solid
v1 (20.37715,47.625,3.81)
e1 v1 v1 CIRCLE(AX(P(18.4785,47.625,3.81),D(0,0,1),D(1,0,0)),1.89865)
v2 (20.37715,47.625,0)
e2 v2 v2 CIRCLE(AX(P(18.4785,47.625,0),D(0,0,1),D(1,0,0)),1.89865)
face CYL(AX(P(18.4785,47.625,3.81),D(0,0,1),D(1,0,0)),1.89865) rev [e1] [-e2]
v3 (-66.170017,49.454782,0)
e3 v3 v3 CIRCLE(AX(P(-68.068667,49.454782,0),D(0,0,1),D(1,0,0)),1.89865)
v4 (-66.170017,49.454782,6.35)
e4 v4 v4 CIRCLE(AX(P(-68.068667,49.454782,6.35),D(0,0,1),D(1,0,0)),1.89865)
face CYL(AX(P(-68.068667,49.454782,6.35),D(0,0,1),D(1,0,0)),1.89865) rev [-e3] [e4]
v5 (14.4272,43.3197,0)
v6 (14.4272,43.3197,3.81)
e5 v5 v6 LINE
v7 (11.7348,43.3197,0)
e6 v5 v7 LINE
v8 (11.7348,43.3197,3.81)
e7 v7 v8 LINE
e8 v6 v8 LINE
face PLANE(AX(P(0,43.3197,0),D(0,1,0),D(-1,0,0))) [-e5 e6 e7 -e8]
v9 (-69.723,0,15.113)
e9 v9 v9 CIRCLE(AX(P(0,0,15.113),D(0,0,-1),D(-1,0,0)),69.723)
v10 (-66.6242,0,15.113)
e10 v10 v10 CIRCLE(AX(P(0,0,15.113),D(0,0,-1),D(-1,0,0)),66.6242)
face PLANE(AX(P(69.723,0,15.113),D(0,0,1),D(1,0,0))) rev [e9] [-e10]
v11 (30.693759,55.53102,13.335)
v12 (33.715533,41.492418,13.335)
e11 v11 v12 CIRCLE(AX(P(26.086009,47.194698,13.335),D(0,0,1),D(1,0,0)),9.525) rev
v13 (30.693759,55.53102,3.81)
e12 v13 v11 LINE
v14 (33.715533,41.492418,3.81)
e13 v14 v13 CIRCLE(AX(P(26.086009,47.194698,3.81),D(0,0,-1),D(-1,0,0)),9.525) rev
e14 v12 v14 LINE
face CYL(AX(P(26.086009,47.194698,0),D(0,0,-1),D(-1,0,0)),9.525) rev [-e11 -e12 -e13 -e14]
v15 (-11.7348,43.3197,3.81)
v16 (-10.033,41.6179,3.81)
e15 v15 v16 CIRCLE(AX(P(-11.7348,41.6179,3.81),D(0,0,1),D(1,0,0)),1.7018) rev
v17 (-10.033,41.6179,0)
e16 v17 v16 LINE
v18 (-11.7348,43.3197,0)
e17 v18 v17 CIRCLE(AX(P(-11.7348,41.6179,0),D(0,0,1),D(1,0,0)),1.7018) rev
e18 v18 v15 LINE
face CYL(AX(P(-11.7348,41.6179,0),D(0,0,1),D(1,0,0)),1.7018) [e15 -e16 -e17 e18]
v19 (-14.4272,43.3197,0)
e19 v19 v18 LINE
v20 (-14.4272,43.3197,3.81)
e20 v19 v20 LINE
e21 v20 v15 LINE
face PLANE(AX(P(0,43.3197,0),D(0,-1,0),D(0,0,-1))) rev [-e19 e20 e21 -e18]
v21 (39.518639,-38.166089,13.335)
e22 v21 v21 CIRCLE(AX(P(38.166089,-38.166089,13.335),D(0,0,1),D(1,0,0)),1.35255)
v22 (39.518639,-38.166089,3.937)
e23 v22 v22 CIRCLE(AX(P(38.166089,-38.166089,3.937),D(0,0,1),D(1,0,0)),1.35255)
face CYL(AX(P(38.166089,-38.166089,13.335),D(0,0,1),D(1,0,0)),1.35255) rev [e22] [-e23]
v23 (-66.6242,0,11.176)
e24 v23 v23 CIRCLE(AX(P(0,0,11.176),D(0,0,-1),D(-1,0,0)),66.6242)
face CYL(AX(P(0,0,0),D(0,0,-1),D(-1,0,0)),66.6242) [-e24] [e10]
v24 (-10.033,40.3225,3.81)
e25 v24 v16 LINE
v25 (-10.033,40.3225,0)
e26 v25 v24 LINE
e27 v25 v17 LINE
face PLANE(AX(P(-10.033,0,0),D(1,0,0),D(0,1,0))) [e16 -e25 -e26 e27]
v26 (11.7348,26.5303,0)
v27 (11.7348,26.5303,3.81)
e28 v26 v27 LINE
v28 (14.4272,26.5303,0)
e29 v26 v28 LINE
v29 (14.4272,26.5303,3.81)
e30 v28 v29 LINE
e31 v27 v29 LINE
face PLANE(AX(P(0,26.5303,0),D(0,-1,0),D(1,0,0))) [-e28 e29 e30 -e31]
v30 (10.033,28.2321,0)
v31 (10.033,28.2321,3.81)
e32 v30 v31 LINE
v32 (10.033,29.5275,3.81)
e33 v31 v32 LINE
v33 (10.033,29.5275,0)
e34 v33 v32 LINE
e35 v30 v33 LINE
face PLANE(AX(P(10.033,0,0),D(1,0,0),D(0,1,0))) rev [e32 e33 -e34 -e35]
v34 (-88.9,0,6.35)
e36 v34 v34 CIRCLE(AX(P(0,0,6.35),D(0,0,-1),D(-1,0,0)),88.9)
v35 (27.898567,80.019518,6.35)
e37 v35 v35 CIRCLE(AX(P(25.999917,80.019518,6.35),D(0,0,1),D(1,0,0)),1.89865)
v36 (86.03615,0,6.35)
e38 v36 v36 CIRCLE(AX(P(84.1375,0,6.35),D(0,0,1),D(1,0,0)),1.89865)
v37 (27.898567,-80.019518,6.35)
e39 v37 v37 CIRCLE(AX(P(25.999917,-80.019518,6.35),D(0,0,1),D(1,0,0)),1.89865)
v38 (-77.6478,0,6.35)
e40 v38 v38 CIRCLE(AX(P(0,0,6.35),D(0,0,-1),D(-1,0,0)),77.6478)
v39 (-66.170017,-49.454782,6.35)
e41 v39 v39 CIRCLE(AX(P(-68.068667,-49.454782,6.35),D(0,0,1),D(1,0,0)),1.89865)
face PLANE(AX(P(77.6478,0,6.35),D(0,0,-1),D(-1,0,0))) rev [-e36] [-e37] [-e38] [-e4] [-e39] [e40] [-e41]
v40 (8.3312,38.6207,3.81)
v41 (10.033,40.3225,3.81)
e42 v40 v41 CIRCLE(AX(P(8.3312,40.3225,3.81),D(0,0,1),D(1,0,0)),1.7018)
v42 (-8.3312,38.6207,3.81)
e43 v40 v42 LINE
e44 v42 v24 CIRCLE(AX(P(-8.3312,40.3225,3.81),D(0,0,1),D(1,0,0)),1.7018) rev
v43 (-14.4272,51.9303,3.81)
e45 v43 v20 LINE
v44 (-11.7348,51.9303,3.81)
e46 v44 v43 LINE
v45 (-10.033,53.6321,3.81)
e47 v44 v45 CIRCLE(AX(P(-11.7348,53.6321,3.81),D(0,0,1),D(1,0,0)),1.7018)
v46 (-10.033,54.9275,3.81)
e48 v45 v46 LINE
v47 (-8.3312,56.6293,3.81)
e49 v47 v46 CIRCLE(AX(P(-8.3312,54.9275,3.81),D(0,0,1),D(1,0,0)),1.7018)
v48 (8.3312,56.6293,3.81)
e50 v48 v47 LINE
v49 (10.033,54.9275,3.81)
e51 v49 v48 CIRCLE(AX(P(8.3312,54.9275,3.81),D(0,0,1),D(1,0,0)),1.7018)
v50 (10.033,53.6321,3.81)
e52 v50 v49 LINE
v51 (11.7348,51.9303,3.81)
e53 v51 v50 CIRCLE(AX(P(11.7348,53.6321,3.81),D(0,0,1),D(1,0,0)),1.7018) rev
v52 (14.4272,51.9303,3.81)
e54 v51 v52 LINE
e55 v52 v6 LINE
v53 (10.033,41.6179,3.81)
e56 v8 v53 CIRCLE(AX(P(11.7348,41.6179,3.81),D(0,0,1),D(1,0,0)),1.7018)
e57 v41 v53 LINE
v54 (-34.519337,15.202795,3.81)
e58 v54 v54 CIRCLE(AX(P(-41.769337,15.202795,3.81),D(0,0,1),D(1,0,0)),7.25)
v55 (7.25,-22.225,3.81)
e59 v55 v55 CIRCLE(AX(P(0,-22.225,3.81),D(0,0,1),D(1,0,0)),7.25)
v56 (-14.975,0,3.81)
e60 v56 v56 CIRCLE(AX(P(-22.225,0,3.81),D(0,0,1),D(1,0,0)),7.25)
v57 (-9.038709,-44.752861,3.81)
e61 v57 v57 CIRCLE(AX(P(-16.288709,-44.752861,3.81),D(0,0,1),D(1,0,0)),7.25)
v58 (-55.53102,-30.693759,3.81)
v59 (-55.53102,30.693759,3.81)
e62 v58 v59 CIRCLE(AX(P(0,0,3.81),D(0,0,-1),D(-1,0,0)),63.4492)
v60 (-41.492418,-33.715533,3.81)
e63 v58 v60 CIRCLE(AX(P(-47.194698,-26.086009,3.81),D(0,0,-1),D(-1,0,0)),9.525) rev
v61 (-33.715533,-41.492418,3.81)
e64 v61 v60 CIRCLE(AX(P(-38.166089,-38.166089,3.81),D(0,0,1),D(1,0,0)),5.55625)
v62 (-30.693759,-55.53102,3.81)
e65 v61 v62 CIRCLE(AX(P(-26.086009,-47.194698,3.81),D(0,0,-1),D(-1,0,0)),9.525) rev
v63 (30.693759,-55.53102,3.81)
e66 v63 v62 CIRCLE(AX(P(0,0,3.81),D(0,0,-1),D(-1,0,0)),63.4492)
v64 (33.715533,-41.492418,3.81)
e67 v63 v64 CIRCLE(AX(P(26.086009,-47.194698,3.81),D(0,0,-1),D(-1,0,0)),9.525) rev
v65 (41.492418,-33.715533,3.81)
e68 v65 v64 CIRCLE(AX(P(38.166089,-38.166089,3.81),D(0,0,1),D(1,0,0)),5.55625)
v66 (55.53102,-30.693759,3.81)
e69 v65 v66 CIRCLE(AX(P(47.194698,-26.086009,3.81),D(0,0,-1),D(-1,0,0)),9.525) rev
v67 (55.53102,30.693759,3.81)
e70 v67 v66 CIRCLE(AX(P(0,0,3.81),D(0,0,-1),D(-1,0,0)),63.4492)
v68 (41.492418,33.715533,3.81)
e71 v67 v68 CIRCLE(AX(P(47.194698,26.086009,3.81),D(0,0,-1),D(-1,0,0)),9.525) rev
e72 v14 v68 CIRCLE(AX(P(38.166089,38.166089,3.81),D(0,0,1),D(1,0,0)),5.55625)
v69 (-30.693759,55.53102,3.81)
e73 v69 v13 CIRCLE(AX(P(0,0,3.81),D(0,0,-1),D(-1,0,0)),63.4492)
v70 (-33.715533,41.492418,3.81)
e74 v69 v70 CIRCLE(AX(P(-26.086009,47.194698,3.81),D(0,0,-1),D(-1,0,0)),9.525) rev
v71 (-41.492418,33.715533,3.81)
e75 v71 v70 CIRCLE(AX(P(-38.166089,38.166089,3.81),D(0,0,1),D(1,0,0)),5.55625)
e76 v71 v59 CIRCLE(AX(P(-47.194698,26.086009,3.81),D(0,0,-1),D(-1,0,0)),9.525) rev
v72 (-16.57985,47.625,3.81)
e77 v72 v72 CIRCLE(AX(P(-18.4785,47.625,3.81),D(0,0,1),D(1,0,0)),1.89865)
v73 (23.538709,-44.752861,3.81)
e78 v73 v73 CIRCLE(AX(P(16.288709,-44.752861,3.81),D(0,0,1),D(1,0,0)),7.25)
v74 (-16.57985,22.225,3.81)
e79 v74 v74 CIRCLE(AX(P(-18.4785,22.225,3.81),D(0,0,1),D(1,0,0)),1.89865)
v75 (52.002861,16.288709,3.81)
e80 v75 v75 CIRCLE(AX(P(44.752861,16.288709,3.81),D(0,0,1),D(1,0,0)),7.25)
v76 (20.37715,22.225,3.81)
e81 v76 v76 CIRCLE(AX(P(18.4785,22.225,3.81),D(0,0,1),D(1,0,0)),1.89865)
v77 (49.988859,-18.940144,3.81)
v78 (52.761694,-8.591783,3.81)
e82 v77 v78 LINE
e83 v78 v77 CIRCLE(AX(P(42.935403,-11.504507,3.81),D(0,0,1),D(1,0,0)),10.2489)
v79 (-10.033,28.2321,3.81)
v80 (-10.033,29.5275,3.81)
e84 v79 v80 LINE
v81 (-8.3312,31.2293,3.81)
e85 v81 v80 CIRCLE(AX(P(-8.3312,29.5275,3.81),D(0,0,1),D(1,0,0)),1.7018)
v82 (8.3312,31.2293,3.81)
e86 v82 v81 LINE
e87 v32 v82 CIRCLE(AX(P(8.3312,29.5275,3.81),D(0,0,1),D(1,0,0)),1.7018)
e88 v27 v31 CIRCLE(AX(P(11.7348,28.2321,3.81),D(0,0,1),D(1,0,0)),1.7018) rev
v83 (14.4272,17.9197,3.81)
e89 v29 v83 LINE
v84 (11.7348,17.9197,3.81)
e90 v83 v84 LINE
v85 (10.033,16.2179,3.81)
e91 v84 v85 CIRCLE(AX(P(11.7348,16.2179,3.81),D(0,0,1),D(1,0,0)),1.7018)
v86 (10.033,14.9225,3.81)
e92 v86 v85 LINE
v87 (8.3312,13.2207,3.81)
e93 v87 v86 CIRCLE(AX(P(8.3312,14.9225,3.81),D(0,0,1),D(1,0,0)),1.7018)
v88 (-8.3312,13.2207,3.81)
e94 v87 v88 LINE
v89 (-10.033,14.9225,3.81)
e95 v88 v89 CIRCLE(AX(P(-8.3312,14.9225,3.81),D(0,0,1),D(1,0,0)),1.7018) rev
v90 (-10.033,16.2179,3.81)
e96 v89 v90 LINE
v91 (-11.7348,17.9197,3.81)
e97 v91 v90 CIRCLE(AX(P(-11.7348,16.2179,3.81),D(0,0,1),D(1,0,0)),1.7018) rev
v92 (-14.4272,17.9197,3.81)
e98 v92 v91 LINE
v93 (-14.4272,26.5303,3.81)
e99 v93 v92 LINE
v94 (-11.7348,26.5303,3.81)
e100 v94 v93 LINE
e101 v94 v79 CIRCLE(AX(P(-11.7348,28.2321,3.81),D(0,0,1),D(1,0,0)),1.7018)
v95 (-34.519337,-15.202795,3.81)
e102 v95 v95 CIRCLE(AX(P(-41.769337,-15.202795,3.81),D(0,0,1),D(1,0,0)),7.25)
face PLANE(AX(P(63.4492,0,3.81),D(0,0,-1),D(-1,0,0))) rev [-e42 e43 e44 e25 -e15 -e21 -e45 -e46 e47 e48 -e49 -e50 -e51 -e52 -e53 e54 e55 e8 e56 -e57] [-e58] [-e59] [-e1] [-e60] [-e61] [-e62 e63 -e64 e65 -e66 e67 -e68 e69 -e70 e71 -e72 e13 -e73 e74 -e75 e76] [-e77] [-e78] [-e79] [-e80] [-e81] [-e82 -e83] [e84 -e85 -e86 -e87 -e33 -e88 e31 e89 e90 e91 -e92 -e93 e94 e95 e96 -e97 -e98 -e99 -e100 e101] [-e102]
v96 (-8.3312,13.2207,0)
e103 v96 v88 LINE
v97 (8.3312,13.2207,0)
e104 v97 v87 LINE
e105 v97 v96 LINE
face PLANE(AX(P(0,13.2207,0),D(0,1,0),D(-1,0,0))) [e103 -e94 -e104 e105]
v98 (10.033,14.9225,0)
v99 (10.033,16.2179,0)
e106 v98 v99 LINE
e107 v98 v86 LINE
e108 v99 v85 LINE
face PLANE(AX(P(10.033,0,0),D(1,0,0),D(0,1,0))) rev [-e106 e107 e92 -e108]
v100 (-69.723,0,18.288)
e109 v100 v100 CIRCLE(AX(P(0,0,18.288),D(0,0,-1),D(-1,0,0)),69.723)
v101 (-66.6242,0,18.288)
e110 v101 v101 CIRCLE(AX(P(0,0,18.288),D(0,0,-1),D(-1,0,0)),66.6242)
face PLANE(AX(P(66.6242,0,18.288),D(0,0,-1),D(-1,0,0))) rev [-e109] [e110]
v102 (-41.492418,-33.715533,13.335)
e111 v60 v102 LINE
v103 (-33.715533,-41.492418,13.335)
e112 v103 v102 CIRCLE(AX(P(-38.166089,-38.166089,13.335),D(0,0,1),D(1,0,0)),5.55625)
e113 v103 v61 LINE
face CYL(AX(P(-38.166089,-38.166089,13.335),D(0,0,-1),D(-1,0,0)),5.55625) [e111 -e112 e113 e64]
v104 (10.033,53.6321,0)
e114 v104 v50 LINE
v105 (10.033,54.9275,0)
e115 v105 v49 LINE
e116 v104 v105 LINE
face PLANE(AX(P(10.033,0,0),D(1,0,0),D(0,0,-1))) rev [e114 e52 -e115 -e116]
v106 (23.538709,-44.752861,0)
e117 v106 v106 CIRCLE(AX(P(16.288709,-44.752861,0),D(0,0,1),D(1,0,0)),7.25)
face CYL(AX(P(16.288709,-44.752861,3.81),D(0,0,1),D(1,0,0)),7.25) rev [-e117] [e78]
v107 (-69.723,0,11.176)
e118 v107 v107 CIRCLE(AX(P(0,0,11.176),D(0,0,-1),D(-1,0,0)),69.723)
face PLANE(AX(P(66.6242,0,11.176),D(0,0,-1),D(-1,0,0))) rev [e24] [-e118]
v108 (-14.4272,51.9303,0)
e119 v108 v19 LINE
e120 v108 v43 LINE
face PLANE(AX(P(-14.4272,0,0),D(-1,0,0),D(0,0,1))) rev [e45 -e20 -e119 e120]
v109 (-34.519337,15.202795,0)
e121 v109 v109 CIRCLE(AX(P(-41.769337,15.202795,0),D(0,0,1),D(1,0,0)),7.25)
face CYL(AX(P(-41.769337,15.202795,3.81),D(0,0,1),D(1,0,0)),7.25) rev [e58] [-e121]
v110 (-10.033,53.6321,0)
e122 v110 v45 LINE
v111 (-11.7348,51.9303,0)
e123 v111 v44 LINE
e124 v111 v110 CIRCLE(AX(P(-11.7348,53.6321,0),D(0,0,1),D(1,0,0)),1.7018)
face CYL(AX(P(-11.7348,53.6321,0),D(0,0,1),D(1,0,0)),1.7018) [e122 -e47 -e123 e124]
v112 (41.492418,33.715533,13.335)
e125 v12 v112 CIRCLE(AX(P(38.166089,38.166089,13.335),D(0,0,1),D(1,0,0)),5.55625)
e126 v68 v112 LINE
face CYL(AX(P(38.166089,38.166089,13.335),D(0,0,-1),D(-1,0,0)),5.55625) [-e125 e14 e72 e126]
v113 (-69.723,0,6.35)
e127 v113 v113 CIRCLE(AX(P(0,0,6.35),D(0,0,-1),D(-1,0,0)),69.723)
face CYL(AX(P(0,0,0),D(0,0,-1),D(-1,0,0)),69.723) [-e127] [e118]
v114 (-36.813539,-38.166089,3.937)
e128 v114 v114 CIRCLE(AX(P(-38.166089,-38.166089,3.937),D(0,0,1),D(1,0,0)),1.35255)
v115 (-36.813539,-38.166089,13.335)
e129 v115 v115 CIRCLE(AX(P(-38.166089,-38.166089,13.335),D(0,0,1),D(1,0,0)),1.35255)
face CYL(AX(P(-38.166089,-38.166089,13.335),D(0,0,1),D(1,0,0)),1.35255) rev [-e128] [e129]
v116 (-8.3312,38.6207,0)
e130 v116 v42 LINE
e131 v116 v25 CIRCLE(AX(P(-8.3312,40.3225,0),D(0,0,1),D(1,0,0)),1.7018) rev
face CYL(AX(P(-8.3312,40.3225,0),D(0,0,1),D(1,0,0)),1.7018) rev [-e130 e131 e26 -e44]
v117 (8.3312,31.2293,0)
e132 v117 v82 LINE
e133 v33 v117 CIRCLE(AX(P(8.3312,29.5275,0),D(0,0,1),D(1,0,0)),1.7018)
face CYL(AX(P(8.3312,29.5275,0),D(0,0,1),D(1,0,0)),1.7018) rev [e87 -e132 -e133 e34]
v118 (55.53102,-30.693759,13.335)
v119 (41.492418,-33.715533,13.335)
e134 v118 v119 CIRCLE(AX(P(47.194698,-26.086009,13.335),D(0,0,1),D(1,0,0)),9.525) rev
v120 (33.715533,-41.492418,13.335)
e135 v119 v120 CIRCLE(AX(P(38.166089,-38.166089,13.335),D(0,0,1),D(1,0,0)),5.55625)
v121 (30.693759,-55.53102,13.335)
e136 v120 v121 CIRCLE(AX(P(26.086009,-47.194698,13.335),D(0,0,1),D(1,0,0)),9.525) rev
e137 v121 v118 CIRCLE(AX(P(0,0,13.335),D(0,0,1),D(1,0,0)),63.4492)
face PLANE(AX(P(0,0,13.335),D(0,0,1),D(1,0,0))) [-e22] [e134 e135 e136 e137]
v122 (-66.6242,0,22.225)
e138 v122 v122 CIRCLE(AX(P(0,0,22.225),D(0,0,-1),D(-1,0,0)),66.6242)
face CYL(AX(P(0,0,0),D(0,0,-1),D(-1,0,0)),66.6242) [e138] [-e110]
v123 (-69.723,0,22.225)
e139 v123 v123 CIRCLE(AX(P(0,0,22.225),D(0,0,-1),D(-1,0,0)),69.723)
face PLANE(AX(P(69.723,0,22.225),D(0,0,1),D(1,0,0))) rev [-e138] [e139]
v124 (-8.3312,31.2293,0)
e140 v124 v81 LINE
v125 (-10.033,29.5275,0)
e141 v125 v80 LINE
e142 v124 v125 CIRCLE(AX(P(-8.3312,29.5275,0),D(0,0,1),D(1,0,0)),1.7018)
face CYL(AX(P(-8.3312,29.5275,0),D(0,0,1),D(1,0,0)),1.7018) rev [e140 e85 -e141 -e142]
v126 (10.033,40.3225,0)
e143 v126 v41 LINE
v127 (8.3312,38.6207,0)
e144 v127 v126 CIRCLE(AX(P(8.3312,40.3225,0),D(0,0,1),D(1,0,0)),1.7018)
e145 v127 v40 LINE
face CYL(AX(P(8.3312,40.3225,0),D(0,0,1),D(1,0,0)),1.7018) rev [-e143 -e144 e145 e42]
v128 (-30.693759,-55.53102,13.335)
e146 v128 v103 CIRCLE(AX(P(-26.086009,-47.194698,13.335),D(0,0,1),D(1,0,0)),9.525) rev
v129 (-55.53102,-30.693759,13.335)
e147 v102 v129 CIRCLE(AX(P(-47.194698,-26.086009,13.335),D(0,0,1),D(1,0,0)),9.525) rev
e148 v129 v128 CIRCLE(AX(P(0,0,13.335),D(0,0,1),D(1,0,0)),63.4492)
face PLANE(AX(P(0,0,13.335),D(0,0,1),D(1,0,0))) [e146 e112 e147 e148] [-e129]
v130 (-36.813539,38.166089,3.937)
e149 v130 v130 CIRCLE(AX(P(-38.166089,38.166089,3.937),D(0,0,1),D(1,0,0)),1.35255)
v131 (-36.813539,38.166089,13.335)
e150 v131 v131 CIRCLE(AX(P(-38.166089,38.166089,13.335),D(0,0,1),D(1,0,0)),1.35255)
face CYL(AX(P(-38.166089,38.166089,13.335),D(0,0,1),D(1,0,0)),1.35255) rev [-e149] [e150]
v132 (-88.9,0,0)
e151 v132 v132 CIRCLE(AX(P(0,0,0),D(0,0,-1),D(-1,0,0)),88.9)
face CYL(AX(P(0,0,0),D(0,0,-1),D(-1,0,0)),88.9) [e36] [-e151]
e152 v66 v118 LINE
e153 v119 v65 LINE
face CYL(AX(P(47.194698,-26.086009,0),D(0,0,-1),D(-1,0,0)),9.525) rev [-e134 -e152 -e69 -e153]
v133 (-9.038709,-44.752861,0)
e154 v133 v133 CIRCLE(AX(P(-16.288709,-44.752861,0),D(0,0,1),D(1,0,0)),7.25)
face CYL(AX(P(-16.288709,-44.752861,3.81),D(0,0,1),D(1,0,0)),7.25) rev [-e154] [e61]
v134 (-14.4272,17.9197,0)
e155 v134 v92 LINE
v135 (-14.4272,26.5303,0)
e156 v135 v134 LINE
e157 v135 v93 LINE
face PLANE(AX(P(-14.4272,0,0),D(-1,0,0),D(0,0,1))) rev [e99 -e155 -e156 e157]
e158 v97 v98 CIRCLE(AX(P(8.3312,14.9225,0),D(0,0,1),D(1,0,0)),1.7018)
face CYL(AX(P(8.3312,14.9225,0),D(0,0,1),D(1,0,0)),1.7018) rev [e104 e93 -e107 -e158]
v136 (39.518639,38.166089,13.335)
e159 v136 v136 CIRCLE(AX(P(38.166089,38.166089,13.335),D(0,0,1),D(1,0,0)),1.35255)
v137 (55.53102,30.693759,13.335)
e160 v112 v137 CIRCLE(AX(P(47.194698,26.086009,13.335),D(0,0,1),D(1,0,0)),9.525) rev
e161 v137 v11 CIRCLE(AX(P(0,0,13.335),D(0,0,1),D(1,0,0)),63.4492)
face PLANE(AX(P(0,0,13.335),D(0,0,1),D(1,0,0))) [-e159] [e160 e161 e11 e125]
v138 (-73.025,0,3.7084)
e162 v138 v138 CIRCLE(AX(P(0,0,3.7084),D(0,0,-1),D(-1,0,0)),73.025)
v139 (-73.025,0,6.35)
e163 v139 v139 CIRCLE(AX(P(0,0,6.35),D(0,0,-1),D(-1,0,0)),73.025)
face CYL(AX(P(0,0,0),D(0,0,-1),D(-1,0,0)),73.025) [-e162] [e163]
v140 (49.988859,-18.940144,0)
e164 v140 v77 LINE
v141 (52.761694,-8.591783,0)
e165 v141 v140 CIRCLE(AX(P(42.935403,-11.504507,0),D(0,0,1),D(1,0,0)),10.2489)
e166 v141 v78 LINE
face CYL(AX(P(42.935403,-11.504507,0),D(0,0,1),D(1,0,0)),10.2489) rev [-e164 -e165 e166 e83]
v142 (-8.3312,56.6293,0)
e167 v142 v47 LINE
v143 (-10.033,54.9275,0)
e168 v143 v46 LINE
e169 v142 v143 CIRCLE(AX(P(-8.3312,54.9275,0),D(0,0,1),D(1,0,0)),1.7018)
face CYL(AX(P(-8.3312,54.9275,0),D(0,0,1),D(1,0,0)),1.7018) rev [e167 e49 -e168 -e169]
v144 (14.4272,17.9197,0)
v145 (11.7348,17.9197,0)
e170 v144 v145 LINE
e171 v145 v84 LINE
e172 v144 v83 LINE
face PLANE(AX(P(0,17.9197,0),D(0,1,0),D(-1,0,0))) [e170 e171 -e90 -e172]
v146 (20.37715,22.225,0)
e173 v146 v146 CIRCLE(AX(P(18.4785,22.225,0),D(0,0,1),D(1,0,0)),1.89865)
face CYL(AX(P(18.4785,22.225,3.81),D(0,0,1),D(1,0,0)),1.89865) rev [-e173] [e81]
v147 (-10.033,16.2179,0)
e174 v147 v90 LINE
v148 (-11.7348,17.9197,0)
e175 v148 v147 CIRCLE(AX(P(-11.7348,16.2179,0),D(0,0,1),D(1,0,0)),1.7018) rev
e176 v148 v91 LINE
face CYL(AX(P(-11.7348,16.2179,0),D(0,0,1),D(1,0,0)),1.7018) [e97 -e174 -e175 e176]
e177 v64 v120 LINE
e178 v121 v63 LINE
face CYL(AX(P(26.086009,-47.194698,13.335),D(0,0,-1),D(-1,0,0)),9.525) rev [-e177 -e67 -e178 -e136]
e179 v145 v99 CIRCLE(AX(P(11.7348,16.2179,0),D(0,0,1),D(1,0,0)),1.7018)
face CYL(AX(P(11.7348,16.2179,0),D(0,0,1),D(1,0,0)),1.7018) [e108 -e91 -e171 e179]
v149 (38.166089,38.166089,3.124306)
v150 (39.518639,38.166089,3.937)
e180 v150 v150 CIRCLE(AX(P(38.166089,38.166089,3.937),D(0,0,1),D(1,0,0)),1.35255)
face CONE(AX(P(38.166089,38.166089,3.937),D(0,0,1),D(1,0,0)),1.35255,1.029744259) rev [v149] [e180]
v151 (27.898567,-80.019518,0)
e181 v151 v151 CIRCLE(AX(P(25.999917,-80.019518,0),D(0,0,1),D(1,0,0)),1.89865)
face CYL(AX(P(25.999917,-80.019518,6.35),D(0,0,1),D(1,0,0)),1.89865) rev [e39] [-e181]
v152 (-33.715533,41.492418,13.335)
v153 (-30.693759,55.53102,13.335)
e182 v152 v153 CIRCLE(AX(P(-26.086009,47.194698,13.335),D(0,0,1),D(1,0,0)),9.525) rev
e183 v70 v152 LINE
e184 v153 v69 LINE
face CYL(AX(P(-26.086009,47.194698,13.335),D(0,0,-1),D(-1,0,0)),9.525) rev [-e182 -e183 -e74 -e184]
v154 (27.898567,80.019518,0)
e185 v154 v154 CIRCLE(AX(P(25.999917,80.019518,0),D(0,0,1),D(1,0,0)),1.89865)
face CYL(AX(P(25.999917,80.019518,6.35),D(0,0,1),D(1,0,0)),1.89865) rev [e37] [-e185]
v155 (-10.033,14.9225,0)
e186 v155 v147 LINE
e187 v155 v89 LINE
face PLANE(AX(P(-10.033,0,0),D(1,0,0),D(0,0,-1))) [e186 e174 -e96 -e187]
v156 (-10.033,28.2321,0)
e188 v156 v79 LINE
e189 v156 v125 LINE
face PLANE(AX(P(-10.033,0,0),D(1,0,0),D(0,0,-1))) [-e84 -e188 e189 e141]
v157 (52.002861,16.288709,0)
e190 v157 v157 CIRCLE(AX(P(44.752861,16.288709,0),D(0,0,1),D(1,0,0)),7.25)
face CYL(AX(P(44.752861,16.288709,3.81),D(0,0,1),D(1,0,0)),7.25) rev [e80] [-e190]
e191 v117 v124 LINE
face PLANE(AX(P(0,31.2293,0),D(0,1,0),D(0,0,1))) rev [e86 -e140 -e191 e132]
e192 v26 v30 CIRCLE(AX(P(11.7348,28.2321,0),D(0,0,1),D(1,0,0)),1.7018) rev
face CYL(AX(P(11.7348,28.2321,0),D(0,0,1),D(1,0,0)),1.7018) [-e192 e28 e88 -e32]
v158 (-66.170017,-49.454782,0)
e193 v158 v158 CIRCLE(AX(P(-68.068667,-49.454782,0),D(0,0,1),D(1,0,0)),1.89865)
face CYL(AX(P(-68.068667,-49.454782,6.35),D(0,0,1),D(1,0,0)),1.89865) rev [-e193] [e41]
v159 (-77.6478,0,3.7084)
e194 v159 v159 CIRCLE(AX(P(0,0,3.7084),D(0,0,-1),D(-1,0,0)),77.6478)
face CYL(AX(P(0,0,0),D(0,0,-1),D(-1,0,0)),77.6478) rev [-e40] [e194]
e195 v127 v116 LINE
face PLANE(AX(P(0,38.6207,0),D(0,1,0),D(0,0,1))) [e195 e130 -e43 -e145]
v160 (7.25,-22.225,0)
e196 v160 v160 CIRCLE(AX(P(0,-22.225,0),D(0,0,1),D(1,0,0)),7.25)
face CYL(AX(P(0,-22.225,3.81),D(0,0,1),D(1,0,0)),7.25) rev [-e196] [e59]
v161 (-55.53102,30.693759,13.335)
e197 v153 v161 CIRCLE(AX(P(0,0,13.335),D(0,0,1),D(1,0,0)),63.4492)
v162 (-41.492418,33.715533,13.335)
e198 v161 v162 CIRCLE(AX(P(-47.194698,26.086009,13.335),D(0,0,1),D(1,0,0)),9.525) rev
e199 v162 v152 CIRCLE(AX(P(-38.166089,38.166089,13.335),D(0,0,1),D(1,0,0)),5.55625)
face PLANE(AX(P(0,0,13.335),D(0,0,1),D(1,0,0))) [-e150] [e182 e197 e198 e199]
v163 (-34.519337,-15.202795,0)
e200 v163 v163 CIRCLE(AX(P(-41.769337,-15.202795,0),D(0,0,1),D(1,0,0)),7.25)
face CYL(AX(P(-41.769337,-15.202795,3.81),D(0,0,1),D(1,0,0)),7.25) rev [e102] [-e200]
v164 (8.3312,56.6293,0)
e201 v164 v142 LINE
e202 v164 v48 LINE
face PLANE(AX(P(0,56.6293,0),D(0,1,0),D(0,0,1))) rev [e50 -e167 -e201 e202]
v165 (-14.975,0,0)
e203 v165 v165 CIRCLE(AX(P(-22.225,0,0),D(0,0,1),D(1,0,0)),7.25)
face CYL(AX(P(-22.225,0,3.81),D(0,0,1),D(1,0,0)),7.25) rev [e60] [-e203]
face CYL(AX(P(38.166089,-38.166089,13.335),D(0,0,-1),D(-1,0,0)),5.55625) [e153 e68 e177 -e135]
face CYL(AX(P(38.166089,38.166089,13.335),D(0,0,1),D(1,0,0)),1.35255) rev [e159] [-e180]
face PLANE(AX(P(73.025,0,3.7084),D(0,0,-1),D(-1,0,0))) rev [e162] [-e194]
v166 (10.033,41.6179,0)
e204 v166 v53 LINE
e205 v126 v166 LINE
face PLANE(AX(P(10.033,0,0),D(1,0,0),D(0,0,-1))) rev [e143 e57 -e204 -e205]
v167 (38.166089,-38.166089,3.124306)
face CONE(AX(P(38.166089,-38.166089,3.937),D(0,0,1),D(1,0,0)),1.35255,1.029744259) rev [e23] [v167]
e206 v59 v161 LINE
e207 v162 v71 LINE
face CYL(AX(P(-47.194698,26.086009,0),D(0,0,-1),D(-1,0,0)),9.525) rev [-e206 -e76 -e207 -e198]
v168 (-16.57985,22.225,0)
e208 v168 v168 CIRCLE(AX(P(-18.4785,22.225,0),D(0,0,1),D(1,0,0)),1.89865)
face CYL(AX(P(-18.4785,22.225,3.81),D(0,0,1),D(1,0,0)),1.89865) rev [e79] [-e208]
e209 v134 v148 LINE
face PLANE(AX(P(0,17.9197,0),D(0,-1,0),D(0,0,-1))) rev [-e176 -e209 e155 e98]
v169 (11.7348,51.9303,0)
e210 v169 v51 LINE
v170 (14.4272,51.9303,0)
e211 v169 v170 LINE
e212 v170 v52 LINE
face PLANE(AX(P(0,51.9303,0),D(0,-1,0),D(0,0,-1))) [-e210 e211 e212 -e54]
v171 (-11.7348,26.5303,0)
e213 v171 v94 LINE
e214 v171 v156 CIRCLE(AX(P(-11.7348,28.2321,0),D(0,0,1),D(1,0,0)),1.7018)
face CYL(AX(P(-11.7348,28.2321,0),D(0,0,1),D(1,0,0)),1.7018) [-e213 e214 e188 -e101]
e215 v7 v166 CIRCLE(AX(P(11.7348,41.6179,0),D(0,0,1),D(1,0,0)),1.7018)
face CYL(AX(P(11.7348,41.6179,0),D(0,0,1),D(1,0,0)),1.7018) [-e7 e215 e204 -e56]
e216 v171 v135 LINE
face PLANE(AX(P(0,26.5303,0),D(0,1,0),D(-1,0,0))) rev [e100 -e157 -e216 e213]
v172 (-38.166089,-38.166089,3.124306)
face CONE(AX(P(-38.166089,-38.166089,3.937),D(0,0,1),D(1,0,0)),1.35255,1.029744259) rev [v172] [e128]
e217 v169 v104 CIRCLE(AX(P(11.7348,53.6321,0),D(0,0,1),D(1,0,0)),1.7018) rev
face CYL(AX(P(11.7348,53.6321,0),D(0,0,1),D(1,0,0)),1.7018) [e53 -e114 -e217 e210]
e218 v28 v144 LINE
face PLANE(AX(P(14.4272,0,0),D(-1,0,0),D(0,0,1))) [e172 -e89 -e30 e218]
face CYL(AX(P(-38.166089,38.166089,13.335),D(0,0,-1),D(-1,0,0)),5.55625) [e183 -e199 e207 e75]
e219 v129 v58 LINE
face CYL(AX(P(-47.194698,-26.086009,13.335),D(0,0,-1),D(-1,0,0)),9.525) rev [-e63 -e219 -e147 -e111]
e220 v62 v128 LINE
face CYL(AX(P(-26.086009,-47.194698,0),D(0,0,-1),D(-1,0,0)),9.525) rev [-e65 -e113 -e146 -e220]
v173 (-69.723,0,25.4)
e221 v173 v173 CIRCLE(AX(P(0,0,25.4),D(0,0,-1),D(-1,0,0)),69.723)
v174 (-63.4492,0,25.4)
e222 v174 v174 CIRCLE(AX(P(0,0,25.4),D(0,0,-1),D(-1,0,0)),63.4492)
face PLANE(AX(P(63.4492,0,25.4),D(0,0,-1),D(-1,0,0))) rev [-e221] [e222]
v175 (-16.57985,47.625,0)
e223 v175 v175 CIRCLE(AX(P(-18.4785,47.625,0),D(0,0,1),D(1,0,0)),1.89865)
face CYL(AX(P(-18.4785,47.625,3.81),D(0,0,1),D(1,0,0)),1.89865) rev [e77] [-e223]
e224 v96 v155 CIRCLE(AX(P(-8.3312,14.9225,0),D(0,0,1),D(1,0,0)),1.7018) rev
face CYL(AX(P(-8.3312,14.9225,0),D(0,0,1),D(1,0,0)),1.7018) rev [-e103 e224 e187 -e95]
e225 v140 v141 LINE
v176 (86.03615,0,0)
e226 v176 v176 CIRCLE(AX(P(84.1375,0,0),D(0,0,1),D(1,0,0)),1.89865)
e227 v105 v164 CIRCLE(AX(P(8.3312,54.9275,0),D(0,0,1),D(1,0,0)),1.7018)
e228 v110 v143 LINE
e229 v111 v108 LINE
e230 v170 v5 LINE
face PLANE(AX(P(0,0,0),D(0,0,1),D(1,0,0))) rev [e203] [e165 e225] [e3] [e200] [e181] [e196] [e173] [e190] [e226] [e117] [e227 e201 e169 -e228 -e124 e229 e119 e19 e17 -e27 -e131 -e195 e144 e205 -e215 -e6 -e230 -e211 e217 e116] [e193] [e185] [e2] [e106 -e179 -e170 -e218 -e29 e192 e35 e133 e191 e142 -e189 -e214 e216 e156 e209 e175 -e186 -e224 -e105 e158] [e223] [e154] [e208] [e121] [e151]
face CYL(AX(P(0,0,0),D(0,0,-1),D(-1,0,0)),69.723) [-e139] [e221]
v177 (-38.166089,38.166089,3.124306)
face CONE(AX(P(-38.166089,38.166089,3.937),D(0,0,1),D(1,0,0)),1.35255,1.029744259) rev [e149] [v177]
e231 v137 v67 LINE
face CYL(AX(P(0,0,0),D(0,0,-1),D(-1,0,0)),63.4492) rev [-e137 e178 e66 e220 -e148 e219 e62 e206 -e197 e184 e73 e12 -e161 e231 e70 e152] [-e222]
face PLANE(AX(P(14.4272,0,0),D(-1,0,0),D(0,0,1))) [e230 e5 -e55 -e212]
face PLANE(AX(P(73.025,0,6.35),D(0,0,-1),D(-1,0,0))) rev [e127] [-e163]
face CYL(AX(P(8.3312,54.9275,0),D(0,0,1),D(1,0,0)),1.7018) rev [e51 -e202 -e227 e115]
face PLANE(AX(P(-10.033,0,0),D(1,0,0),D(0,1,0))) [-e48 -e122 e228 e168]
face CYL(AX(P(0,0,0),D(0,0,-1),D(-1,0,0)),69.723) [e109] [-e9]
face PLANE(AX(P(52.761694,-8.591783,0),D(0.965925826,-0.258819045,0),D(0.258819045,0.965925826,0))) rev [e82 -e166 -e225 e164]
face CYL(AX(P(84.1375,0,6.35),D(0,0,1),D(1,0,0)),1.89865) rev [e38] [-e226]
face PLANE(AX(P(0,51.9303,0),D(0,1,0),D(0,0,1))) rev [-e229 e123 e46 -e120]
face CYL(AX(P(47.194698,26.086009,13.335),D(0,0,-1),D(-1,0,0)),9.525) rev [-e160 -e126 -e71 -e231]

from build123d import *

# Parameters (mm, degrees)
F_6_CLEARANCE_HOLE1_D      = 3.7973
F_6_CLEARANCE_HOLE1_DEPTH  = 25.4
F_6_CLEARANCE_HOLE1_TIP    = 1.140824014
CUT_EXTRUDE1_DEPTH         = 128.563898106
F_6_CLEARANCE_HOLE2_D      = 3.7973
F_6_CLEARANCE_HOLE2_DEPTH  = 7.874
F_6_CLEARANCE_HOLE2_TIP    = 1.140824014
SKETCH11_R                 = 5.55625
BOSS_EXTRUDE1_DEPTH        = 9.525
CUT_EXTRUDE2_DEPTH         = 128.563898106
FILLET1_R                  = 9.525
M16X1_5_TAPPED_HOLE1_D     = 14.5
M16X1_5_TAPPED_HOLE1_DEPTH = 36.576
M16X1_5_TAPPED_HOLE1_TIP   = 4.356239488
F_6_32_TAPPED_HOLE2_D      = 2.7051
F_6_32_TAPPED_HOLE2_DEPTH  = 9.398
F_6_32_TAPPED_HOLE2_TIP    = 0.81269403


with BuildPart() as part:
    # Sketch1 → Revolve1 (revolve)
    with BuildSketch(Plane(origin=(0, 0, 0), x_dir=(1, 0, 0), z_dir=(0, 1, 0)), mode=Mode.PRIVATE) as revolve1_sk:
        Polygon((0, 0), (88.9, 0), (88.9, -6.35), (77.6478, -6.35), (77.6478, -3.7084), (73.025, -3.7084), (73.025, -6.35), (69.723, -6.35), (69.723, -11.176), (66.6242, -11.176), (66.6242, -15.113), (69.723, -15.113), (69.723, -18.288), (66.6242, -18.288), (66.6242, -22.225), (69.723, -22.225), (69.723, -25.4), (63.4492, -25.4), (63.4492, -3.81), (0, -3.81), align=None)
    revolve(revolve1_sk.sketch.rotate(Axis((0, 0, 0), (0, 0, 1)), 180), axis=Axis((0, 0, 0), (0, 0, 1)))

    # #6 Clearance Hole1
    with Locations(Plane.XY.offset(6.35)):
        with Locations((84.1375, 0), (25.999917364, -80.01951764), (-68.068667364, -49.454781665), (-68.068667364, 49.454781665), (25.999917364, 80.01951764)):
            Hole(F_6_CLEARANCE_HOLE1_D / 2, depth=F_6_CLEARANCE_HOLE1_DEPTH)
            with Locations((0, 0, -(F_6_CLEARANCE_HOLE1_DEPTH + F_6_CLEARANCE_HOLE1_TIP / 2))):  # 118° drill point
                Cone(0, F_6_CLEARANCE_HOLE1_D / 2, F_6_CLEARANCE_HOLE1_TIP, mode=Mode.SUBTRACT)

    # Sketch4 → Cut-Extrude1 (cut, through all)
    with BuildSketch(Plane.XY.offset(3.81)):
        with BuildLine():
            ThreePointArc((-11.7348, 26.5303), (-10.53144568, 27.02874568), (-10.033, 28.2321))
            Line((-10.033, 28.2321), (-10.033, 29.5275))
            ThreePointArc((-10.033, 29.5275), (-9.53455432, 30.73085432), (-8.3312, 31.2293))
            Line((-8.3312, 31.2293), (8.3312, 31.2293))
            ThreePointArc((8.3312, 31.2293), (9.53455432, 30.73085432), (10.033, 29.5275))
            Line((10.033, 29.5275), (10.033, 28.2321))
            ThreePointArc((10.033, 28.2321), (10.53144568, 27.02874568), (11.7348, 26.5303))
            Line((11.7348, 26.5303), (14.4272, 26.5303))
            Line((14.4272, 26.5303), (14.4272, 17.9197))
            Line((14.4272, 17.9197), (11.7348, 17.9197))
            ThreePointArc((11.7348, 17.9197), (10.53144568, 17.42125432), (10.033, 16.2179))
            Line((10.033, 16.2179), (10.033, 14.9225))
            ThreePointArc((10.033, 14.9225), (9.53455432, 13.71914568), (8.3312, 13.2207))
            Line((8.3312, 13.2207), (-8.3312, 13.2207))
            ThreePointArc((-8.3312, 13.2207), (-9.53455432, 13.71914568), (-10.033, 14.9225))
            Line((-10.033, 14.9225), (-10.033, 16.2179))
            ThreePointArc((-10.033, 16.2179), (-10.53144568, 17.42125432), (-11.7348, 17.9197))
            Line((-11.7348, 17.9197), (-14.4272, 17.9197))
            Line((-14.4272, 17.9197), (-14.4272, 26.5303))
            Line((-14.4272, 26.5303), (-11.7348, 26.5303))
        make_face()
        with BuildLine():
            Line((8.3312, 56.6293), (-8.3312, 56.6293))
            ThreePointArc((-8.3312, 56.6293), (-9.53455432, 56.13085432), (-10.033, 54.9275))
            Line((-10.033, 54.9275), (-10.033, 53.6321))
            ThreePointArc((-10.033, 53.6321), (-10.53144568, 52.42874568), (-11.7348, 51.9303))
            Line((-11.7348, 51.9303), (-14.4272, 51.9303))
            Line((-14.4272, 51.9303), (-14.4272, 43.3197))
            Line((-14.4272, 43.3197), (-11.7348, 43.3197))
            ThreePointArc((-11.7348, 43.3197), (-10.53144568, 42.82125432), (-10.033, 41.6179))
            Line((-10.033, 41.6179), (-10.033, 40.3225))
            ThreePointArc((-10.033, 40.3225), (-9.53455432, 39.11914568), (-8.3312, 38.6207))
            Line((-8.3312, 38.6207), (8.3312, 38.6207))
            ThreePointArc((8.3312, 38.6207), (9.53455432, 39.11914568), (10.033, 40.3225))
            Line((10.033, 40.3225), (10.033, 41.6179))
            ThreePointArc((10.033, 41.6179), (10.53144568, 42.82125432), (11.7348, 43.3197))
            Line((11.7348, 43.3197), (14.4272, 43.3197))
            Line((14.4272, 43.3197), (14.4272, 51.9303))
            Line((14.4272, 51.9303), (11.7348, 51.9303))
            ThreePointArc((11.7348, 51.9303), (10.53144568, 52.42874568), (10.033, 53.6321))
            Line((10.033, 53.6321), (10.033, 54.9275))
            ThreePointArc((10.033, 54.9275), (9.53455432, 56.13085432), (8.3312, 56.6293))
        make_face()
    extrude(amount=-CUT_EXTRUDE1_DEPTH, mode=Mode.SUBTRACT)

    # #6 Clearance Hole2
    with Locations(Plane.XY.offset(3.81)):
        with Locations((-18.4785, 47.625), (18.4785, 47.625), (-18.4785, 22.225), (18.4785, 22.225)):
            Hole(F_6_CLEARANCE_HOLE2_D / 2, depth=F_6_CLEARANCE_HOLE2_DEPTH)
            with Locations((0, 0, -(F_6_CLEARANCE_HOLE2_DEPTH + F_6_CLEARANCE_HOLE2_TIP / 2))):  # 118° drill point
                Cone(0, F_6_CLEARANCE_HOLE2_D / 2, F_6_CLEARANCE_HOLE2_TIP, mode=Mode.SUBTRACT)

    # Sketch11 → Boss-Extrude1 (add)
    with BuildSketch(Plane.XY.offset(3.81)):
        with BuildLine():
            Line((-48.930669698, 40.392951657), (-41.887522062, 34.040213285))
            ThreePointArc((-41.887522062, 34.040213285), (-42.094950568, 42.094950568), (-34.040213285, 41.887522062))
            Line((-34.040213285, 41.887522062), (-40.392951657, 48.930669698))
            ThreePointArc((-40.392951657, 48.930669698), (-44.865359581, 44.865359581), (-48.930669698, 40.392951657))
        make_face()
        with Locations((-38.166088515, 38.166088515)):
            Circle(SKETCH11_R)
        with Locations((38.166088515, 38.166088515)):
            Circle(SKETCH11_R)
        with BuildLine():
            ThreePointArc((43.722338515, 38.166088515), (43.242954143, 35.908357473), (41.887522062, 34.040213285))
            Line((41.887522062, 34.040213285), (48.930669698, 40.392951657))
            ThreePointArc((48.930669698, 40.392951657), (44.865359581, 44.865359581), (40.392951657, 48.930669698))
            Line((40.392951657, 48.930669698), (34.040213285, 41.887522062))
            ThreePointArc((34.040213285, 41.887522062), (40.159517698, 43.352431557), (43.722338515, 38.166088515))
        make_face()
        with Locations((38.166088515, -38.166088515)):
            Circle(SKETCH11_R)
        with BuildLine():
            Line((48.930669698, -40.392951657), (41.887522062, -34.040213285))
            ThreePointArc((41.887522062, -34.040213285), (43.242954143, -35.908357473), (43.722338515, -38.166088515))
            ThreePointArc((43.722338515, -38.166088515), (40.159517698, -43.352431557), (34.040213285, -41.887522062))
            Line((34.040213285, -41.887522062), (40.392951657, -48.930669698))
            ThreePointArc((40.392951657, -48.930669698), (44.865359581, -44.865359581), (48.930669698, -40.392951657))
        make_face()
        with BuildLine():
            ThreePointArc((-34.040213285, -41.887522062), (-42.094950568, -42.094950568), (-41.887522062, -34.040213285))
            Line((-41.887522062, -34.040213285), (-48.930669698, -40.392951657))
            ThreePointArc((-48.930669698, -40.392951657), (-44.865359581, -44.865359581), (-40.392951657, -48.930669698))
            Line((-40.392951657, -48.930669698), (-34.040213285, -41.887522062))
        make_face()
        with Locations((-38.166088515, -38.166088515)):
            Circle(SKETCH11_R)
    extrude(amount=BOSS_EXTRUDE1_DEPTH)

    # Sketch7 → Cut-Extrude2 (cut, through all)
    with BuildSketch(Plane.XY.offset(3.81)):
        with BuildLine():
            Line((52.761693969, -8.591783329), (49.988858988, -18.940144357))
            ThreePointArc((49.988858988, -18.940144357), (33.035725777, -8.851896043), (52.761693969, -8.591783329))
        make_face()
    extrude(amount=-CUT_EXTRUDE2_DEPTH, mode=Mode.SUBTRACT)

    # Fillet1
    # the kernel refuses this fillet: 9.525 mm, written as the material it adds along each edge
    with BuildSketch(Plane(origin=(-48.930669698, -40.392951657, 3.81), x_dir=(-0.5625955256004904, 0.8267322871246218, 0), z_dir=(0, 0, 1)), Plane(origin=(40.392951657, -48.930669698, 3.81), x_dir=(-0.8267322871246213, -0.5625955256004911, 0), z_dir=(0, 0, 1)), Plane(origin=(48.930669698, 40.392951657, 3.81), x_dir=(0.5625955256004896, -0.8267322871246222, 0), z_dir=(0, 0, 1)), Plane(origin=(-40.392951657, 48.930669698, 3.81), x_dir=(0.8267322871246212, 0.5625955256004912, 0), z_dir=(0, 0, 1))) as fillet1_piece_1:
        with BuildLine():
            CenterArc((10.85136124, -9.484206116), FILLET1_R, 84.695337095, 97.843486082)
            Line((1.335710636, -9.906128608), (0.384145576, -9.948320857))
            ThreePointArc((0.384145576, -9.948320857), (0.345915242, -9.526322078), (-0.943655336, -0.129502341))
            Line((-0.943655336, -0.129502341), (-0.08806017, 0.948420612))
            ThreePointArc((-0.08806017, 0.948420612), (5.865981471, 1.224241662), (11.820023112, 0.948420612))
            Line((11.820023112, 0.948420612), (11.731962942, 0))
        make_face()
    extrude(amount=9.525)
    with BuildSketch(Plane(origin=(-40.392951657, -48.930669698, 3.81), x_dir=(0.826732287124621, -0.5625955256004915, 0), z_dir=(0, 0, 1)), Plane(origin=(48.930669698, -40.392951657, 3.81), x_dir=(0.5625955256004891, 0.8267322871246228, 0), z_dir=(0, 0, 1)), Plane(origin=(40.392951657, 48.930669698, 3.81), x_dir=(-0.8267322871246218, 0.5625955256004905, 0), z_dir=(0, 0, 1)), Plane(origin=(-48.930669698, 40.392951657, 3.81), x_dir=(-0.5625955256004898, -0.8267322871246221, 0), z_dir=(0, 0, 1))) as fillet1_piece_2:
        with BuildLine():
            CenterArc((10.85136124, 9.484206116), FILLET1_R, 177.461176823, 97.843486082)
            Line((1.335710636, 9.906128608), (0.384145576, 9.948320857))
            ThreePointArc((0.384145576, 9.948320857), (0.345915242, 9.526322078), (-0.943655336, 0.129502341))
            Line((-0.943655336, 0.129502341), (-0.08806017, -0.948420612))
            ThreePointArc((-0.08806017, -0.948420612), (5.865981471, -1.224241662), (11.820023112, -0.948420612))
            Line((11.820023112, -0.948420612), (11.731962942, 0))
        make_face()
    extrude(amount=9.525)

    # M16x1.5 Tapped Hole1
    with Locations(Plane.XY.offset(3.81)):
        with Locations((44.752861065, 16.288709326), (-22.225, 0), (0, -22.225), (-16.288709326, -44.752861065), (-41.769336994, 15.202795371), (-41.769336994, -15.202795371), (16.288709326, -44.752861065)):
            Hole(M16X1_5_TAPPED_HOLE1_D / 2, depth=M16X1_5_TAPPED_HOLE1_DEPTH)
            with Locations((0, 0, -(M16X1_5_TAPPED_HOLE1_DEPTH + M16X1_5_TAPPED_HOLE1_TIP / 2))):  # 118° drill point
                Cone(0, M16X1_5_TAPPED_HOLE1_D / 2, M16X1_5_TAPPED_HOLE1_TIP, mode=Mode.SUBTRACT)

    # #6-32 Tapped Hole2
    with Locations(Plane.XY.offset(13.335)):
        with Locations((-38.166088515, 38.166088515), (38.166088515, 38.166088515), (38.166088515, -38.166088515), (-38.166088515, -38.166088515)):
            Hole(F_6_32_TAPPED_HOLE2_D / 2, depth=F_6_32_TAPPED_HOLE2_DEPTH)
            with Locations((0, 0, -(F_6_32_TAPPED_HOLE2_DEPTH + F_6_32_TAPPED_HOLE2_TIP / 2))):  # 118° drill point
                Cone(0, F_6_32_TAPPED_HOLE2_D / 2, F_6_32_TAPPED_HOLE2_TIP, mode=Mode.SUBTRACT)


solid = part.part
